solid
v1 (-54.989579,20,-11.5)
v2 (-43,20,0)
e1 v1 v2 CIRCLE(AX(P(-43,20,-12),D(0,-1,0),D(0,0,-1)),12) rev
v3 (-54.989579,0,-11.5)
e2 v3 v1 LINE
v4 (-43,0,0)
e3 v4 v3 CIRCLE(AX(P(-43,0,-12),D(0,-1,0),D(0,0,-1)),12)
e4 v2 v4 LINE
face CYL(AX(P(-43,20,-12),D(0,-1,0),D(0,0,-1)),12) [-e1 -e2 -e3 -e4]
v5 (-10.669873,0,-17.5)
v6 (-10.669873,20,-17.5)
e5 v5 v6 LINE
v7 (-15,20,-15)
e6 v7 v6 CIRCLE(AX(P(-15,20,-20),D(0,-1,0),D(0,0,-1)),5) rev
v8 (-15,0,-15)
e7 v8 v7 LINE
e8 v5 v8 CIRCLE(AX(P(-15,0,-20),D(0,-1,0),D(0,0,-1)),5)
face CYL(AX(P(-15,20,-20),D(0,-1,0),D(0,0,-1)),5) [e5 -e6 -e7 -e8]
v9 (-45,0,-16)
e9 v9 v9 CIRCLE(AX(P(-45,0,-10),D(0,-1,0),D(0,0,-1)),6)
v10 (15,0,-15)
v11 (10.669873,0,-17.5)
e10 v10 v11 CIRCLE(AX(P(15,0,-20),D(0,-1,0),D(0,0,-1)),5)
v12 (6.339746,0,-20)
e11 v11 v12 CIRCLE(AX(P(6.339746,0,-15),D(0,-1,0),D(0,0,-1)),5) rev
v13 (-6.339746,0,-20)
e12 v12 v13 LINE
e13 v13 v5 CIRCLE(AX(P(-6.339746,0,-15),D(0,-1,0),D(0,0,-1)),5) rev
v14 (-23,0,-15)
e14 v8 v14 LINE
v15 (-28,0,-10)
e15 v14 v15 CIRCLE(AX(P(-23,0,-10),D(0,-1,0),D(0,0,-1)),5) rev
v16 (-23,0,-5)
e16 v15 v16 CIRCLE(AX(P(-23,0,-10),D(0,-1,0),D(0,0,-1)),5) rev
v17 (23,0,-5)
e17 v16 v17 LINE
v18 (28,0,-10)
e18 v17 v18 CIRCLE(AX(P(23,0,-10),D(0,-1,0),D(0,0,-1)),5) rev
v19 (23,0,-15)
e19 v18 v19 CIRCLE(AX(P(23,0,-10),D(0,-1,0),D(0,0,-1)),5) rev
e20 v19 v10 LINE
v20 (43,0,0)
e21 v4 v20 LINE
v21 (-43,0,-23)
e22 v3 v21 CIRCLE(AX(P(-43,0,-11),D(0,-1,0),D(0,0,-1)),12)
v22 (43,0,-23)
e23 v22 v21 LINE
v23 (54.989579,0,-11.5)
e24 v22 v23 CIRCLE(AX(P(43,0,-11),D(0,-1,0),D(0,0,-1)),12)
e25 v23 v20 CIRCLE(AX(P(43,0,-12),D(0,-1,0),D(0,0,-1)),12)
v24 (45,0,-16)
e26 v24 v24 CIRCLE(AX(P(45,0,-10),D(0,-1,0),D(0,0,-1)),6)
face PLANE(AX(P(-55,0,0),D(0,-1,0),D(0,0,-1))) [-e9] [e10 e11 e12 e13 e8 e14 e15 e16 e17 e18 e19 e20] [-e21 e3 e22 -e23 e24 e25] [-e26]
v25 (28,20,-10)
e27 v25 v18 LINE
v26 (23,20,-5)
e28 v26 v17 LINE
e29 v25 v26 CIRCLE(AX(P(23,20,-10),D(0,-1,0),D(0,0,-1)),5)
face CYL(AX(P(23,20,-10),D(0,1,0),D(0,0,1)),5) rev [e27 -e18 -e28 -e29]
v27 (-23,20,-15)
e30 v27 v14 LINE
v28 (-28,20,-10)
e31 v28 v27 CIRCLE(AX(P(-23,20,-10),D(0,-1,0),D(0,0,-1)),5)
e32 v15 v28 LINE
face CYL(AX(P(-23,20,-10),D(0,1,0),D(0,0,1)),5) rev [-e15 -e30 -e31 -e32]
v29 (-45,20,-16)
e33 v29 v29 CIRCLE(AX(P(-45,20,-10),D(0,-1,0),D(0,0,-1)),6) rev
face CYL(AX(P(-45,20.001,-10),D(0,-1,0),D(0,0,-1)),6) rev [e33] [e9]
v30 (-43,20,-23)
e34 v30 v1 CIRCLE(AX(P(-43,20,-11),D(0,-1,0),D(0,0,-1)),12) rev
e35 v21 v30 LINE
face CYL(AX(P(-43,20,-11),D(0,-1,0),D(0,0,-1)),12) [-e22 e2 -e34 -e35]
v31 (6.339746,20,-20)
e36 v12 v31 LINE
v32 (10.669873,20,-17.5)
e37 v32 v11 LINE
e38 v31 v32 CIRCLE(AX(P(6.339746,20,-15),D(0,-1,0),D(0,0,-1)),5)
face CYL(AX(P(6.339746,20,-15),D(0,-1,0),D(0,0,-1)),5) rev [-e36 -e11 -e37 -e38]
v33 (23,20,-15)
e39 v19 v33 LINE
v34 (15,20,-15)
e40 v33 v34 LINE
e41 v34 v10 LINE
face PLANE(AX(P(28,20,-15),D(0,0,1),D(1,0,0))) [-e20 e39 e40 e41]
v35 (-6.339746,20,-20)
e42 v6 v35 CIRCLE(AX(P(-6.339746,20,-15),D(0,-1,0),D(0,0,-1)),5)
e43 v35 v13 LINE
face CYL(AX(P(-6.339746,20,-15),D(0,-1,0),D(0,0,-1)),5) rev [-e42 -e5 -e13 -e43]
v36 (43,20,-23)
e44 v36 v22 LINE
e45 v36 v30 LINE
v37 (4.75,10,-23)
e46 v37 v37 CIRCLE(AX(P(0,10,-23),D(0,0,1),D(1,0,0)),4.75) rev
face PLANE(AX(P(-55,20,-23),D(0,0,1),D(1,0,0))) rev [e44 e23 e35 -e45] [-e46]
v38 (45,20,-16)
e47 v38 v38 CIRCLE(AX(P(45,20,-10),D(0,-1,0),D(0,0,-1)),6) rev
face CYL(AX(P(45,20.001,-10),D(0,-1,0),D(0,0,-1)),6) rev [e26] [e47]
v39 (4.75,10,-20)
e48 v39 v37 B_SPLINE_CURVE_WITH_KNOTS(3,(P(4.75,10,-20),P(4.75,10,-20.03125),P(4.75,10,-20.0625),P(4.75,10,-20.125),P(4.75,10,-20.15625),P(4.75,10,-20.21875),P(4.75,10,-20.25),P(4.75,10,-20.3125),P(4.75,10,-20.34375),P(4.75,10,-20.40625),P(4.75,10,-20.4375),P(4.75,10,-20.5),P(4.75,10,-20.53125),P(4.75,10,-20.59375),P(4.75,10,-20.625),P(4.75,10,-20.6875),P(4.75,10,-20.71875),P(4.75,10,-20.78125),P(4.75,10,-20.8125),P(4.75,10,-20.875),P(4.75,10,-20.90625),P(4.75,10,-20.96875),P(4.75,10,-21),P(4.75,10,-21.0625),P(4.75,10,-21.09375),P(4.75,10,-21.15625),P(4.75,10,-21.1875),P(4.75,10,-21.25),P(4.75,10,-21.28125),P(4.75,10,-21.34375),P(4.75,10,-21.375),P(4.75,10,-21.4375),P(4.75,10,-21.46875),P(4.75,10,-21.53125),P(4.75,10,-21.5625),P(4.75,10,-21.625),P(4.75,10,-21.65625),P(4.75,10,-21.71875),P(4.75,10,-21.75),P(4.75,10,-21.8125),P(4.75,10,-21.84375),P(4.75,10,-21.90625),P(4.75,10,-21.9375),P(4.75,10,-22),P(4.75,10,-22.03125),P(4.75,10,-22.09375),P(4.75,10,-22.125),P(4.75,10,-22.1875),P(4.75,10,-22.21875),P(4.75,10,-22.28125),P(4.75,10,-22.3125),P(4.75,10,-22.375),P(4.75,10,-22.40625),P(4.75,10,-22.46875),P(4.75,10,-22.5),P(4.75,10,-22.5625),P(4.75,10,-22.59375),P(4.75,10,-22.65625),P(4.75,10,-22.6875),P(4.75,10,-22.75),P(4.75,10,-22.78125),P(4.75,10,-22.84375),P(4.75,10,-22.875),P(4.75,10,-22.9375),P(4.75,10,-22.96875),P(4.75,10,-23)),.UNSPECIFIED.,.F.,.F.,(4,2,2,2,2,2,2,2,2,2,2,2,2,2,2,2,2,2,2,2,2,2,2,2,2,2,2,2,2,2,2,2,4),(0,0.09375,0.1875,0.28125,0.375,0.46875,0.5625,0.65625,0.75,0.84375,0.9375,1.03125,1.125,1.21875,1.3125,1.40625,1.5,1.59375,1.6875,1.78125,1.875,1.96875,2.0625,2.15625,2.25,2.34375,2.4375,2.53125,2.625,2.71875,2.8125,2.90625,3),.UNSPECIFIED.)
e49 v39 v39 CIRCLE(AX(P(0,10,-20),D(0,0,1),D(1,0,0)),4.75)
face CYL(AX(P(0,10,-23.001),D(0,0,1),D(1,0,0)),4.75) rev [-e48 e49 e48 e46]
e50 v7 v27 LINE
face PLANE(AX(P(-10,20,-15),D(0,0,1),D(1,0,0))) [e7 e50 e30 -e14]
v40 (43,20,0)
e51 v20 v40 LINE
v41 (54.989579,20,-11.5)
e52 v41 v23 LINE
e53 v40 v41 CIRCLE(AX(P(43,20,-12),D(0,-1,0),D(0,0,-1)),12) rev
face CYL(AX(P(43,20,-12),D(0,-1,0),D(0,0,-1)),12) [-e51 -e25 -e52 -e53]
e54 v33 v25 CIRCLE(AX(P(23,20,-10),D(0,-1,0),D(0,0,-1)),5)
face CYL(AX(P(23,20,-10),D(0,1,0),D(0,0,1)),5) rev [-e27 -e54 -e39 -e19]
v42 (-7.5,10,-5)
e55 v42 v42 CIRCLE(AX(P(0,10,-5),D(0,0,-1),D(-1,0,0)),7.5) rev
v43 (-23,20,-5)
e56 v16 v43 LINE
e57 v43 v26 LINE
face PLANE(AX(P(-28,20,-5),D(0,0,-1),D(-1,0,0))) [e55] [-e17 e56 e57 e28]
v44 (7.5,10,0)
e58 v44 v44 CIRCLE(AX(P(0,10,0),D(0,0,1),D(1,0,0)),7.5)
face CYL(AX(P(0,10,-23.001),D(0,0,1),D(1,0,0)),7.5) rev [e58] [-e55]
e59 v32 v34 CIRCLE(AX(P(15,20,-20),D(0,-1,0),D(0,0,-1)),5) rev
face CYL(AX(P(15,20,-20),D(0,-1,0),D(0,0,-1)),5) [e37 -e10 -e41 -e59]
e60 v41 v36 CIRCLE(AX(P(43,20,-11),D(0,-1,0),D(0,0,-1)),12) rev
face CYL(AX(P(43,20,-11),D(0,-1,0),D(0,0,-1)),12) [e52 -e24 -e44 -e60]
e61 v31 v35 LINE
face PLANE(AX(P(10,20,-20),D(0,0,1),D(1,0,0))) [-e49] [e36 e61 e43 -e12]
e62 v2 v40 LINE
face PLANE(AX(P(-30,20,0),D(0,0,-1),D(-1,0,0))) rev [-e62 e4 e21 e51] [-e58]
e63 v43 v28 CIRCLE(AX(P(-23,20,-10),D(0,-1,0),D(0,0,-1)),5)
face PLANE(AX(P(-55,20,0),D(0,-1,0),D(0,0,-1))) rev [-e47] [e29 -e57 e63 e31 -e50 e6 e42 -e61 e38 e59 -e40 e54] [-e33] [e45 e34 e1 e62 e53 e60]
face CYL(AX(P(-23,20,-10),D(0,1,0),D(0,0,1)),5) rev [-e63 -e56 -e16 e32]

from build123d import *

# Parameters (mm, degrees)
BOSS_EXTRU_1_DEPTH      = 20
ENL_V_MAT_EXTRU_1_REACH = 63.847
ESQUISSE2_R             = 4.75
ENL_V_MAT_EXTRU_2_REACH = 64.881
ESQUISSE3_R             = 6
CONG_7_START            = -1
CONG_7_DEPTH            = 22
CONG_7_2_DEPTH          = 20
CONG_8_R                = 5
ENL_V_MAT_EXTRU_3_REACH = 64.881
ESQUISSE4_R             = 7.5
CONG_9_R                = 5
CONG_10_R               = 12


with BuildPart() as part:
    # Esquisse1 → Boss.-Extru.1 (new body)
    with BuildSketch(Plane(origin=(0, 0, 0), x_dir=(1, 0, 0), z_dir=(0, 1, 0))):
        Polygon((-30, 0), (-55, 0), (-55, 23), (55, 23), (55, 0), (25, 0), align=None)
        Polygon((28, 5), (28, 15), (10, 15), (10, 20), (-10, 20), (-10, 15), (-28, 15), (-28, 5), align=None, mode=Mode.SUBTRACT)
    extrude(amount=BOSS_EXTRU_1_DEPTH)

    # Esquisse2 → Enlèv. mat.-Extru.1 (cut, up to next)
    with BuildSketch(Plane.XY.offset(-20), mode=Mode.PRIVATE) as enl_v_mat_extru_1_sk1:
        with Locations((0, 10)):
            Circle(ESQUISSE2_R)
    enl_v_mat_extru_1_tool1 = extrude(enl_v_mat_extru_1_sk1.sketch, amount=-ENL_V_MAT_EXTRU_1_REACH, mode=Mode.PRIVATE) & part.part
    add(enl_v_mat_extru_1_tool1.solids().sort_by_distance((0, 10, -20))[0], mode=Mode.SUBTRACT)

    # Esquisse3 → Enlèv. mat.-Extru.2 (cut, up to next)
    with BuildSketch(Plane.XZ, mode=Mode.PRIVATE) as enl_v_mat_extru_2_sk1:
        with Locations(Location((45, -10, 0), (0, 0, 270))):
            Circle(ESQUISSE3_R)
    enl_v_mat_extru_2_tool1 = extrude(enl_v_mat_extru_2_sk1.sketch, amount=-ENL_V_MAT_EXTRU_2_REACH, mode=Mode.PRIVATE) & part.part
    # Esquisse3 → Enlèv. mat.-Extru.2 (cut, up to next)
    with BuildSketch(Plane.XZ, mode=Mode.PRIVATE) as enl_v_mat_extru_2_sk2:
        with Locations(Location((-45, -10, 0), (0, 0, 270))):
            Circle(ESQUISSE3_R)
    enl_v_mat_extru_2_tool2 = extrude(enl_v_mat_extru_2_sk2.sketch, amount=-ENL_V_MAT_EXTRU_2_REACH, mode=Mode.PRIVATE) & part.part
    add(enl_v_mat_extru_2_tool1.solids().sort_by_distance((45, 0, -10))[0], mode=Mode.SUBTRACT)
    add(enl_v_mat_extru_2_tool2.solids().sort_by_distance((-45, 0, -10))[0], mode=Mode.SUBTRACT)

    # Congé7: read off the stored shape, not the designer's step
    # Congé7 outline → Congé7 (cut)
    with BuildSketch(Plane(origin=(0, 0, 0), x_dir=(1, 0, 0), z_dir=(0, 1, 0)).offset(CONG_7_START)):
        with BuildLine():
            Line((-10, 15), (-10, 20))
            ThreePointArc((-10, 20), (-11.464466094, 16.464466094), (-15, 15))
            Line((-15, 15), (-10, 15))
        make_face()
        with BuildLine():
            Line((10, 15), (15, 15))
            ThreePointArc((15, 15), (11.464466094, 16.464466094), (10, 20))
            Line((10, 20), (10, 15))
        make_face()
    extrude(amount=CONG_7_DEPTH, mode=Mode.SUBTRACT)

    # Cong_7 2 outline → Cong_7 2 (add)
    with BuildSketch(Plane(origin=(0, 0, 0), x_dir=(1, 0, 0), z_dir=(0, 1, 0))):
        with BuildLine():
            ThreePointArc((-28, 10), (-26.535533906, 13.535533906), (-23, 15))
            Line((-23, 15), (-28, 15))
            Line((-28, 15), (-28, 10))
        make_face()
        with BuildLine():
            Line((28, 15), (23, 15))
            ThreePointArc((23, 15), (26.535533906, 13.535533906), (28, 10))
            Line((28, 10), (28, 15))
        make_face()
    extrude(amount=CONG_7_2_DEPTH)

    # Congé8
    cong_8_edges = [part.edges().sort_by_distance(p)[0] for p in [
        (-28, 10, -5),
        (28, 10, -5),
    ]]
    fillet(cong_8_edges, radius=CONG_8_R - 0.0001)  # a hair under: the kernel refuses the full size

    # Esquisse4 → Enlèv. mat.-Extru.3 (cut, up to next)
    with BuildSketch(Plane.XY, mode=Mode.PRIVATE) as enl_v_mat_extru_3_sk1:
        with Locations((0, 10)):
            Circle(ESQUISSE4_R)
    enl_v_mat_extru_3_tool1 = extrude(enl_v_mat_extru_3_sk1.sketch, amount=-ENL_V_MAT_EXTRU_3_REACH, mode=Mode.PRIVATE) & part.part
    add(enl_v_mat_extru_3_tool1.solids().sort_by_distance((0, 10, 0))[0], mode=Mode.SUBTRACT)

    # Congé9
    cong_9_edges = [part.edges().sort_by_distance(p)[0] for p in [
        (10, 10, -20),
        (-10, 10, -20),
    ]]
    fillet(cong_9_edges, radius=CONG_9_R)

    # Congé10
    # the kernel refuses this fillet: 12 mm, written as the material it takes off along each edge
    with BuildSketch(Plane(origin=(55, -30, -23), x_dir=(-1, 0, 0), z_dir=(0, 1, 0)), Plane(origin=(-55, -30, -23), x_dir=(0, 0, 1), z_dir=(0, 1, 0)), Plane(origin=(-55, -30, 0), x_dir=(1, 0, 0), z_dir=(0, 1, 0))) as cong_10_piece_1:
        with BuildLine():
            CenterArc((CONG_10_R, CONG_10_R), CONG_10_R, 180, 90)
            Line((0, CONG_10_R), (0, 0))
            Line((0, 0), (CONG_10_R, 0))
        make_face()
    extrude(amount=80, mode=Mode.SUBTRACT)
    with BuildSketch(Plane(origin=(55, -30, 0), x_dir=(-1, 0, 0), z_dir=(0, 1, 0))) as cong_10_piece_2:
        with BuildLine():
            CenterArc((CONG_10_R, -CONG_10_R), CONG_10_R, 90, 90)
            Line((0, -CONG_10_R), (0, 0))
            Line((0, 0), (CONG_10_R, 0))
        make_face()
    extrude(amount=80, mode=Mode.SUBTRACT)


solid = part.part
